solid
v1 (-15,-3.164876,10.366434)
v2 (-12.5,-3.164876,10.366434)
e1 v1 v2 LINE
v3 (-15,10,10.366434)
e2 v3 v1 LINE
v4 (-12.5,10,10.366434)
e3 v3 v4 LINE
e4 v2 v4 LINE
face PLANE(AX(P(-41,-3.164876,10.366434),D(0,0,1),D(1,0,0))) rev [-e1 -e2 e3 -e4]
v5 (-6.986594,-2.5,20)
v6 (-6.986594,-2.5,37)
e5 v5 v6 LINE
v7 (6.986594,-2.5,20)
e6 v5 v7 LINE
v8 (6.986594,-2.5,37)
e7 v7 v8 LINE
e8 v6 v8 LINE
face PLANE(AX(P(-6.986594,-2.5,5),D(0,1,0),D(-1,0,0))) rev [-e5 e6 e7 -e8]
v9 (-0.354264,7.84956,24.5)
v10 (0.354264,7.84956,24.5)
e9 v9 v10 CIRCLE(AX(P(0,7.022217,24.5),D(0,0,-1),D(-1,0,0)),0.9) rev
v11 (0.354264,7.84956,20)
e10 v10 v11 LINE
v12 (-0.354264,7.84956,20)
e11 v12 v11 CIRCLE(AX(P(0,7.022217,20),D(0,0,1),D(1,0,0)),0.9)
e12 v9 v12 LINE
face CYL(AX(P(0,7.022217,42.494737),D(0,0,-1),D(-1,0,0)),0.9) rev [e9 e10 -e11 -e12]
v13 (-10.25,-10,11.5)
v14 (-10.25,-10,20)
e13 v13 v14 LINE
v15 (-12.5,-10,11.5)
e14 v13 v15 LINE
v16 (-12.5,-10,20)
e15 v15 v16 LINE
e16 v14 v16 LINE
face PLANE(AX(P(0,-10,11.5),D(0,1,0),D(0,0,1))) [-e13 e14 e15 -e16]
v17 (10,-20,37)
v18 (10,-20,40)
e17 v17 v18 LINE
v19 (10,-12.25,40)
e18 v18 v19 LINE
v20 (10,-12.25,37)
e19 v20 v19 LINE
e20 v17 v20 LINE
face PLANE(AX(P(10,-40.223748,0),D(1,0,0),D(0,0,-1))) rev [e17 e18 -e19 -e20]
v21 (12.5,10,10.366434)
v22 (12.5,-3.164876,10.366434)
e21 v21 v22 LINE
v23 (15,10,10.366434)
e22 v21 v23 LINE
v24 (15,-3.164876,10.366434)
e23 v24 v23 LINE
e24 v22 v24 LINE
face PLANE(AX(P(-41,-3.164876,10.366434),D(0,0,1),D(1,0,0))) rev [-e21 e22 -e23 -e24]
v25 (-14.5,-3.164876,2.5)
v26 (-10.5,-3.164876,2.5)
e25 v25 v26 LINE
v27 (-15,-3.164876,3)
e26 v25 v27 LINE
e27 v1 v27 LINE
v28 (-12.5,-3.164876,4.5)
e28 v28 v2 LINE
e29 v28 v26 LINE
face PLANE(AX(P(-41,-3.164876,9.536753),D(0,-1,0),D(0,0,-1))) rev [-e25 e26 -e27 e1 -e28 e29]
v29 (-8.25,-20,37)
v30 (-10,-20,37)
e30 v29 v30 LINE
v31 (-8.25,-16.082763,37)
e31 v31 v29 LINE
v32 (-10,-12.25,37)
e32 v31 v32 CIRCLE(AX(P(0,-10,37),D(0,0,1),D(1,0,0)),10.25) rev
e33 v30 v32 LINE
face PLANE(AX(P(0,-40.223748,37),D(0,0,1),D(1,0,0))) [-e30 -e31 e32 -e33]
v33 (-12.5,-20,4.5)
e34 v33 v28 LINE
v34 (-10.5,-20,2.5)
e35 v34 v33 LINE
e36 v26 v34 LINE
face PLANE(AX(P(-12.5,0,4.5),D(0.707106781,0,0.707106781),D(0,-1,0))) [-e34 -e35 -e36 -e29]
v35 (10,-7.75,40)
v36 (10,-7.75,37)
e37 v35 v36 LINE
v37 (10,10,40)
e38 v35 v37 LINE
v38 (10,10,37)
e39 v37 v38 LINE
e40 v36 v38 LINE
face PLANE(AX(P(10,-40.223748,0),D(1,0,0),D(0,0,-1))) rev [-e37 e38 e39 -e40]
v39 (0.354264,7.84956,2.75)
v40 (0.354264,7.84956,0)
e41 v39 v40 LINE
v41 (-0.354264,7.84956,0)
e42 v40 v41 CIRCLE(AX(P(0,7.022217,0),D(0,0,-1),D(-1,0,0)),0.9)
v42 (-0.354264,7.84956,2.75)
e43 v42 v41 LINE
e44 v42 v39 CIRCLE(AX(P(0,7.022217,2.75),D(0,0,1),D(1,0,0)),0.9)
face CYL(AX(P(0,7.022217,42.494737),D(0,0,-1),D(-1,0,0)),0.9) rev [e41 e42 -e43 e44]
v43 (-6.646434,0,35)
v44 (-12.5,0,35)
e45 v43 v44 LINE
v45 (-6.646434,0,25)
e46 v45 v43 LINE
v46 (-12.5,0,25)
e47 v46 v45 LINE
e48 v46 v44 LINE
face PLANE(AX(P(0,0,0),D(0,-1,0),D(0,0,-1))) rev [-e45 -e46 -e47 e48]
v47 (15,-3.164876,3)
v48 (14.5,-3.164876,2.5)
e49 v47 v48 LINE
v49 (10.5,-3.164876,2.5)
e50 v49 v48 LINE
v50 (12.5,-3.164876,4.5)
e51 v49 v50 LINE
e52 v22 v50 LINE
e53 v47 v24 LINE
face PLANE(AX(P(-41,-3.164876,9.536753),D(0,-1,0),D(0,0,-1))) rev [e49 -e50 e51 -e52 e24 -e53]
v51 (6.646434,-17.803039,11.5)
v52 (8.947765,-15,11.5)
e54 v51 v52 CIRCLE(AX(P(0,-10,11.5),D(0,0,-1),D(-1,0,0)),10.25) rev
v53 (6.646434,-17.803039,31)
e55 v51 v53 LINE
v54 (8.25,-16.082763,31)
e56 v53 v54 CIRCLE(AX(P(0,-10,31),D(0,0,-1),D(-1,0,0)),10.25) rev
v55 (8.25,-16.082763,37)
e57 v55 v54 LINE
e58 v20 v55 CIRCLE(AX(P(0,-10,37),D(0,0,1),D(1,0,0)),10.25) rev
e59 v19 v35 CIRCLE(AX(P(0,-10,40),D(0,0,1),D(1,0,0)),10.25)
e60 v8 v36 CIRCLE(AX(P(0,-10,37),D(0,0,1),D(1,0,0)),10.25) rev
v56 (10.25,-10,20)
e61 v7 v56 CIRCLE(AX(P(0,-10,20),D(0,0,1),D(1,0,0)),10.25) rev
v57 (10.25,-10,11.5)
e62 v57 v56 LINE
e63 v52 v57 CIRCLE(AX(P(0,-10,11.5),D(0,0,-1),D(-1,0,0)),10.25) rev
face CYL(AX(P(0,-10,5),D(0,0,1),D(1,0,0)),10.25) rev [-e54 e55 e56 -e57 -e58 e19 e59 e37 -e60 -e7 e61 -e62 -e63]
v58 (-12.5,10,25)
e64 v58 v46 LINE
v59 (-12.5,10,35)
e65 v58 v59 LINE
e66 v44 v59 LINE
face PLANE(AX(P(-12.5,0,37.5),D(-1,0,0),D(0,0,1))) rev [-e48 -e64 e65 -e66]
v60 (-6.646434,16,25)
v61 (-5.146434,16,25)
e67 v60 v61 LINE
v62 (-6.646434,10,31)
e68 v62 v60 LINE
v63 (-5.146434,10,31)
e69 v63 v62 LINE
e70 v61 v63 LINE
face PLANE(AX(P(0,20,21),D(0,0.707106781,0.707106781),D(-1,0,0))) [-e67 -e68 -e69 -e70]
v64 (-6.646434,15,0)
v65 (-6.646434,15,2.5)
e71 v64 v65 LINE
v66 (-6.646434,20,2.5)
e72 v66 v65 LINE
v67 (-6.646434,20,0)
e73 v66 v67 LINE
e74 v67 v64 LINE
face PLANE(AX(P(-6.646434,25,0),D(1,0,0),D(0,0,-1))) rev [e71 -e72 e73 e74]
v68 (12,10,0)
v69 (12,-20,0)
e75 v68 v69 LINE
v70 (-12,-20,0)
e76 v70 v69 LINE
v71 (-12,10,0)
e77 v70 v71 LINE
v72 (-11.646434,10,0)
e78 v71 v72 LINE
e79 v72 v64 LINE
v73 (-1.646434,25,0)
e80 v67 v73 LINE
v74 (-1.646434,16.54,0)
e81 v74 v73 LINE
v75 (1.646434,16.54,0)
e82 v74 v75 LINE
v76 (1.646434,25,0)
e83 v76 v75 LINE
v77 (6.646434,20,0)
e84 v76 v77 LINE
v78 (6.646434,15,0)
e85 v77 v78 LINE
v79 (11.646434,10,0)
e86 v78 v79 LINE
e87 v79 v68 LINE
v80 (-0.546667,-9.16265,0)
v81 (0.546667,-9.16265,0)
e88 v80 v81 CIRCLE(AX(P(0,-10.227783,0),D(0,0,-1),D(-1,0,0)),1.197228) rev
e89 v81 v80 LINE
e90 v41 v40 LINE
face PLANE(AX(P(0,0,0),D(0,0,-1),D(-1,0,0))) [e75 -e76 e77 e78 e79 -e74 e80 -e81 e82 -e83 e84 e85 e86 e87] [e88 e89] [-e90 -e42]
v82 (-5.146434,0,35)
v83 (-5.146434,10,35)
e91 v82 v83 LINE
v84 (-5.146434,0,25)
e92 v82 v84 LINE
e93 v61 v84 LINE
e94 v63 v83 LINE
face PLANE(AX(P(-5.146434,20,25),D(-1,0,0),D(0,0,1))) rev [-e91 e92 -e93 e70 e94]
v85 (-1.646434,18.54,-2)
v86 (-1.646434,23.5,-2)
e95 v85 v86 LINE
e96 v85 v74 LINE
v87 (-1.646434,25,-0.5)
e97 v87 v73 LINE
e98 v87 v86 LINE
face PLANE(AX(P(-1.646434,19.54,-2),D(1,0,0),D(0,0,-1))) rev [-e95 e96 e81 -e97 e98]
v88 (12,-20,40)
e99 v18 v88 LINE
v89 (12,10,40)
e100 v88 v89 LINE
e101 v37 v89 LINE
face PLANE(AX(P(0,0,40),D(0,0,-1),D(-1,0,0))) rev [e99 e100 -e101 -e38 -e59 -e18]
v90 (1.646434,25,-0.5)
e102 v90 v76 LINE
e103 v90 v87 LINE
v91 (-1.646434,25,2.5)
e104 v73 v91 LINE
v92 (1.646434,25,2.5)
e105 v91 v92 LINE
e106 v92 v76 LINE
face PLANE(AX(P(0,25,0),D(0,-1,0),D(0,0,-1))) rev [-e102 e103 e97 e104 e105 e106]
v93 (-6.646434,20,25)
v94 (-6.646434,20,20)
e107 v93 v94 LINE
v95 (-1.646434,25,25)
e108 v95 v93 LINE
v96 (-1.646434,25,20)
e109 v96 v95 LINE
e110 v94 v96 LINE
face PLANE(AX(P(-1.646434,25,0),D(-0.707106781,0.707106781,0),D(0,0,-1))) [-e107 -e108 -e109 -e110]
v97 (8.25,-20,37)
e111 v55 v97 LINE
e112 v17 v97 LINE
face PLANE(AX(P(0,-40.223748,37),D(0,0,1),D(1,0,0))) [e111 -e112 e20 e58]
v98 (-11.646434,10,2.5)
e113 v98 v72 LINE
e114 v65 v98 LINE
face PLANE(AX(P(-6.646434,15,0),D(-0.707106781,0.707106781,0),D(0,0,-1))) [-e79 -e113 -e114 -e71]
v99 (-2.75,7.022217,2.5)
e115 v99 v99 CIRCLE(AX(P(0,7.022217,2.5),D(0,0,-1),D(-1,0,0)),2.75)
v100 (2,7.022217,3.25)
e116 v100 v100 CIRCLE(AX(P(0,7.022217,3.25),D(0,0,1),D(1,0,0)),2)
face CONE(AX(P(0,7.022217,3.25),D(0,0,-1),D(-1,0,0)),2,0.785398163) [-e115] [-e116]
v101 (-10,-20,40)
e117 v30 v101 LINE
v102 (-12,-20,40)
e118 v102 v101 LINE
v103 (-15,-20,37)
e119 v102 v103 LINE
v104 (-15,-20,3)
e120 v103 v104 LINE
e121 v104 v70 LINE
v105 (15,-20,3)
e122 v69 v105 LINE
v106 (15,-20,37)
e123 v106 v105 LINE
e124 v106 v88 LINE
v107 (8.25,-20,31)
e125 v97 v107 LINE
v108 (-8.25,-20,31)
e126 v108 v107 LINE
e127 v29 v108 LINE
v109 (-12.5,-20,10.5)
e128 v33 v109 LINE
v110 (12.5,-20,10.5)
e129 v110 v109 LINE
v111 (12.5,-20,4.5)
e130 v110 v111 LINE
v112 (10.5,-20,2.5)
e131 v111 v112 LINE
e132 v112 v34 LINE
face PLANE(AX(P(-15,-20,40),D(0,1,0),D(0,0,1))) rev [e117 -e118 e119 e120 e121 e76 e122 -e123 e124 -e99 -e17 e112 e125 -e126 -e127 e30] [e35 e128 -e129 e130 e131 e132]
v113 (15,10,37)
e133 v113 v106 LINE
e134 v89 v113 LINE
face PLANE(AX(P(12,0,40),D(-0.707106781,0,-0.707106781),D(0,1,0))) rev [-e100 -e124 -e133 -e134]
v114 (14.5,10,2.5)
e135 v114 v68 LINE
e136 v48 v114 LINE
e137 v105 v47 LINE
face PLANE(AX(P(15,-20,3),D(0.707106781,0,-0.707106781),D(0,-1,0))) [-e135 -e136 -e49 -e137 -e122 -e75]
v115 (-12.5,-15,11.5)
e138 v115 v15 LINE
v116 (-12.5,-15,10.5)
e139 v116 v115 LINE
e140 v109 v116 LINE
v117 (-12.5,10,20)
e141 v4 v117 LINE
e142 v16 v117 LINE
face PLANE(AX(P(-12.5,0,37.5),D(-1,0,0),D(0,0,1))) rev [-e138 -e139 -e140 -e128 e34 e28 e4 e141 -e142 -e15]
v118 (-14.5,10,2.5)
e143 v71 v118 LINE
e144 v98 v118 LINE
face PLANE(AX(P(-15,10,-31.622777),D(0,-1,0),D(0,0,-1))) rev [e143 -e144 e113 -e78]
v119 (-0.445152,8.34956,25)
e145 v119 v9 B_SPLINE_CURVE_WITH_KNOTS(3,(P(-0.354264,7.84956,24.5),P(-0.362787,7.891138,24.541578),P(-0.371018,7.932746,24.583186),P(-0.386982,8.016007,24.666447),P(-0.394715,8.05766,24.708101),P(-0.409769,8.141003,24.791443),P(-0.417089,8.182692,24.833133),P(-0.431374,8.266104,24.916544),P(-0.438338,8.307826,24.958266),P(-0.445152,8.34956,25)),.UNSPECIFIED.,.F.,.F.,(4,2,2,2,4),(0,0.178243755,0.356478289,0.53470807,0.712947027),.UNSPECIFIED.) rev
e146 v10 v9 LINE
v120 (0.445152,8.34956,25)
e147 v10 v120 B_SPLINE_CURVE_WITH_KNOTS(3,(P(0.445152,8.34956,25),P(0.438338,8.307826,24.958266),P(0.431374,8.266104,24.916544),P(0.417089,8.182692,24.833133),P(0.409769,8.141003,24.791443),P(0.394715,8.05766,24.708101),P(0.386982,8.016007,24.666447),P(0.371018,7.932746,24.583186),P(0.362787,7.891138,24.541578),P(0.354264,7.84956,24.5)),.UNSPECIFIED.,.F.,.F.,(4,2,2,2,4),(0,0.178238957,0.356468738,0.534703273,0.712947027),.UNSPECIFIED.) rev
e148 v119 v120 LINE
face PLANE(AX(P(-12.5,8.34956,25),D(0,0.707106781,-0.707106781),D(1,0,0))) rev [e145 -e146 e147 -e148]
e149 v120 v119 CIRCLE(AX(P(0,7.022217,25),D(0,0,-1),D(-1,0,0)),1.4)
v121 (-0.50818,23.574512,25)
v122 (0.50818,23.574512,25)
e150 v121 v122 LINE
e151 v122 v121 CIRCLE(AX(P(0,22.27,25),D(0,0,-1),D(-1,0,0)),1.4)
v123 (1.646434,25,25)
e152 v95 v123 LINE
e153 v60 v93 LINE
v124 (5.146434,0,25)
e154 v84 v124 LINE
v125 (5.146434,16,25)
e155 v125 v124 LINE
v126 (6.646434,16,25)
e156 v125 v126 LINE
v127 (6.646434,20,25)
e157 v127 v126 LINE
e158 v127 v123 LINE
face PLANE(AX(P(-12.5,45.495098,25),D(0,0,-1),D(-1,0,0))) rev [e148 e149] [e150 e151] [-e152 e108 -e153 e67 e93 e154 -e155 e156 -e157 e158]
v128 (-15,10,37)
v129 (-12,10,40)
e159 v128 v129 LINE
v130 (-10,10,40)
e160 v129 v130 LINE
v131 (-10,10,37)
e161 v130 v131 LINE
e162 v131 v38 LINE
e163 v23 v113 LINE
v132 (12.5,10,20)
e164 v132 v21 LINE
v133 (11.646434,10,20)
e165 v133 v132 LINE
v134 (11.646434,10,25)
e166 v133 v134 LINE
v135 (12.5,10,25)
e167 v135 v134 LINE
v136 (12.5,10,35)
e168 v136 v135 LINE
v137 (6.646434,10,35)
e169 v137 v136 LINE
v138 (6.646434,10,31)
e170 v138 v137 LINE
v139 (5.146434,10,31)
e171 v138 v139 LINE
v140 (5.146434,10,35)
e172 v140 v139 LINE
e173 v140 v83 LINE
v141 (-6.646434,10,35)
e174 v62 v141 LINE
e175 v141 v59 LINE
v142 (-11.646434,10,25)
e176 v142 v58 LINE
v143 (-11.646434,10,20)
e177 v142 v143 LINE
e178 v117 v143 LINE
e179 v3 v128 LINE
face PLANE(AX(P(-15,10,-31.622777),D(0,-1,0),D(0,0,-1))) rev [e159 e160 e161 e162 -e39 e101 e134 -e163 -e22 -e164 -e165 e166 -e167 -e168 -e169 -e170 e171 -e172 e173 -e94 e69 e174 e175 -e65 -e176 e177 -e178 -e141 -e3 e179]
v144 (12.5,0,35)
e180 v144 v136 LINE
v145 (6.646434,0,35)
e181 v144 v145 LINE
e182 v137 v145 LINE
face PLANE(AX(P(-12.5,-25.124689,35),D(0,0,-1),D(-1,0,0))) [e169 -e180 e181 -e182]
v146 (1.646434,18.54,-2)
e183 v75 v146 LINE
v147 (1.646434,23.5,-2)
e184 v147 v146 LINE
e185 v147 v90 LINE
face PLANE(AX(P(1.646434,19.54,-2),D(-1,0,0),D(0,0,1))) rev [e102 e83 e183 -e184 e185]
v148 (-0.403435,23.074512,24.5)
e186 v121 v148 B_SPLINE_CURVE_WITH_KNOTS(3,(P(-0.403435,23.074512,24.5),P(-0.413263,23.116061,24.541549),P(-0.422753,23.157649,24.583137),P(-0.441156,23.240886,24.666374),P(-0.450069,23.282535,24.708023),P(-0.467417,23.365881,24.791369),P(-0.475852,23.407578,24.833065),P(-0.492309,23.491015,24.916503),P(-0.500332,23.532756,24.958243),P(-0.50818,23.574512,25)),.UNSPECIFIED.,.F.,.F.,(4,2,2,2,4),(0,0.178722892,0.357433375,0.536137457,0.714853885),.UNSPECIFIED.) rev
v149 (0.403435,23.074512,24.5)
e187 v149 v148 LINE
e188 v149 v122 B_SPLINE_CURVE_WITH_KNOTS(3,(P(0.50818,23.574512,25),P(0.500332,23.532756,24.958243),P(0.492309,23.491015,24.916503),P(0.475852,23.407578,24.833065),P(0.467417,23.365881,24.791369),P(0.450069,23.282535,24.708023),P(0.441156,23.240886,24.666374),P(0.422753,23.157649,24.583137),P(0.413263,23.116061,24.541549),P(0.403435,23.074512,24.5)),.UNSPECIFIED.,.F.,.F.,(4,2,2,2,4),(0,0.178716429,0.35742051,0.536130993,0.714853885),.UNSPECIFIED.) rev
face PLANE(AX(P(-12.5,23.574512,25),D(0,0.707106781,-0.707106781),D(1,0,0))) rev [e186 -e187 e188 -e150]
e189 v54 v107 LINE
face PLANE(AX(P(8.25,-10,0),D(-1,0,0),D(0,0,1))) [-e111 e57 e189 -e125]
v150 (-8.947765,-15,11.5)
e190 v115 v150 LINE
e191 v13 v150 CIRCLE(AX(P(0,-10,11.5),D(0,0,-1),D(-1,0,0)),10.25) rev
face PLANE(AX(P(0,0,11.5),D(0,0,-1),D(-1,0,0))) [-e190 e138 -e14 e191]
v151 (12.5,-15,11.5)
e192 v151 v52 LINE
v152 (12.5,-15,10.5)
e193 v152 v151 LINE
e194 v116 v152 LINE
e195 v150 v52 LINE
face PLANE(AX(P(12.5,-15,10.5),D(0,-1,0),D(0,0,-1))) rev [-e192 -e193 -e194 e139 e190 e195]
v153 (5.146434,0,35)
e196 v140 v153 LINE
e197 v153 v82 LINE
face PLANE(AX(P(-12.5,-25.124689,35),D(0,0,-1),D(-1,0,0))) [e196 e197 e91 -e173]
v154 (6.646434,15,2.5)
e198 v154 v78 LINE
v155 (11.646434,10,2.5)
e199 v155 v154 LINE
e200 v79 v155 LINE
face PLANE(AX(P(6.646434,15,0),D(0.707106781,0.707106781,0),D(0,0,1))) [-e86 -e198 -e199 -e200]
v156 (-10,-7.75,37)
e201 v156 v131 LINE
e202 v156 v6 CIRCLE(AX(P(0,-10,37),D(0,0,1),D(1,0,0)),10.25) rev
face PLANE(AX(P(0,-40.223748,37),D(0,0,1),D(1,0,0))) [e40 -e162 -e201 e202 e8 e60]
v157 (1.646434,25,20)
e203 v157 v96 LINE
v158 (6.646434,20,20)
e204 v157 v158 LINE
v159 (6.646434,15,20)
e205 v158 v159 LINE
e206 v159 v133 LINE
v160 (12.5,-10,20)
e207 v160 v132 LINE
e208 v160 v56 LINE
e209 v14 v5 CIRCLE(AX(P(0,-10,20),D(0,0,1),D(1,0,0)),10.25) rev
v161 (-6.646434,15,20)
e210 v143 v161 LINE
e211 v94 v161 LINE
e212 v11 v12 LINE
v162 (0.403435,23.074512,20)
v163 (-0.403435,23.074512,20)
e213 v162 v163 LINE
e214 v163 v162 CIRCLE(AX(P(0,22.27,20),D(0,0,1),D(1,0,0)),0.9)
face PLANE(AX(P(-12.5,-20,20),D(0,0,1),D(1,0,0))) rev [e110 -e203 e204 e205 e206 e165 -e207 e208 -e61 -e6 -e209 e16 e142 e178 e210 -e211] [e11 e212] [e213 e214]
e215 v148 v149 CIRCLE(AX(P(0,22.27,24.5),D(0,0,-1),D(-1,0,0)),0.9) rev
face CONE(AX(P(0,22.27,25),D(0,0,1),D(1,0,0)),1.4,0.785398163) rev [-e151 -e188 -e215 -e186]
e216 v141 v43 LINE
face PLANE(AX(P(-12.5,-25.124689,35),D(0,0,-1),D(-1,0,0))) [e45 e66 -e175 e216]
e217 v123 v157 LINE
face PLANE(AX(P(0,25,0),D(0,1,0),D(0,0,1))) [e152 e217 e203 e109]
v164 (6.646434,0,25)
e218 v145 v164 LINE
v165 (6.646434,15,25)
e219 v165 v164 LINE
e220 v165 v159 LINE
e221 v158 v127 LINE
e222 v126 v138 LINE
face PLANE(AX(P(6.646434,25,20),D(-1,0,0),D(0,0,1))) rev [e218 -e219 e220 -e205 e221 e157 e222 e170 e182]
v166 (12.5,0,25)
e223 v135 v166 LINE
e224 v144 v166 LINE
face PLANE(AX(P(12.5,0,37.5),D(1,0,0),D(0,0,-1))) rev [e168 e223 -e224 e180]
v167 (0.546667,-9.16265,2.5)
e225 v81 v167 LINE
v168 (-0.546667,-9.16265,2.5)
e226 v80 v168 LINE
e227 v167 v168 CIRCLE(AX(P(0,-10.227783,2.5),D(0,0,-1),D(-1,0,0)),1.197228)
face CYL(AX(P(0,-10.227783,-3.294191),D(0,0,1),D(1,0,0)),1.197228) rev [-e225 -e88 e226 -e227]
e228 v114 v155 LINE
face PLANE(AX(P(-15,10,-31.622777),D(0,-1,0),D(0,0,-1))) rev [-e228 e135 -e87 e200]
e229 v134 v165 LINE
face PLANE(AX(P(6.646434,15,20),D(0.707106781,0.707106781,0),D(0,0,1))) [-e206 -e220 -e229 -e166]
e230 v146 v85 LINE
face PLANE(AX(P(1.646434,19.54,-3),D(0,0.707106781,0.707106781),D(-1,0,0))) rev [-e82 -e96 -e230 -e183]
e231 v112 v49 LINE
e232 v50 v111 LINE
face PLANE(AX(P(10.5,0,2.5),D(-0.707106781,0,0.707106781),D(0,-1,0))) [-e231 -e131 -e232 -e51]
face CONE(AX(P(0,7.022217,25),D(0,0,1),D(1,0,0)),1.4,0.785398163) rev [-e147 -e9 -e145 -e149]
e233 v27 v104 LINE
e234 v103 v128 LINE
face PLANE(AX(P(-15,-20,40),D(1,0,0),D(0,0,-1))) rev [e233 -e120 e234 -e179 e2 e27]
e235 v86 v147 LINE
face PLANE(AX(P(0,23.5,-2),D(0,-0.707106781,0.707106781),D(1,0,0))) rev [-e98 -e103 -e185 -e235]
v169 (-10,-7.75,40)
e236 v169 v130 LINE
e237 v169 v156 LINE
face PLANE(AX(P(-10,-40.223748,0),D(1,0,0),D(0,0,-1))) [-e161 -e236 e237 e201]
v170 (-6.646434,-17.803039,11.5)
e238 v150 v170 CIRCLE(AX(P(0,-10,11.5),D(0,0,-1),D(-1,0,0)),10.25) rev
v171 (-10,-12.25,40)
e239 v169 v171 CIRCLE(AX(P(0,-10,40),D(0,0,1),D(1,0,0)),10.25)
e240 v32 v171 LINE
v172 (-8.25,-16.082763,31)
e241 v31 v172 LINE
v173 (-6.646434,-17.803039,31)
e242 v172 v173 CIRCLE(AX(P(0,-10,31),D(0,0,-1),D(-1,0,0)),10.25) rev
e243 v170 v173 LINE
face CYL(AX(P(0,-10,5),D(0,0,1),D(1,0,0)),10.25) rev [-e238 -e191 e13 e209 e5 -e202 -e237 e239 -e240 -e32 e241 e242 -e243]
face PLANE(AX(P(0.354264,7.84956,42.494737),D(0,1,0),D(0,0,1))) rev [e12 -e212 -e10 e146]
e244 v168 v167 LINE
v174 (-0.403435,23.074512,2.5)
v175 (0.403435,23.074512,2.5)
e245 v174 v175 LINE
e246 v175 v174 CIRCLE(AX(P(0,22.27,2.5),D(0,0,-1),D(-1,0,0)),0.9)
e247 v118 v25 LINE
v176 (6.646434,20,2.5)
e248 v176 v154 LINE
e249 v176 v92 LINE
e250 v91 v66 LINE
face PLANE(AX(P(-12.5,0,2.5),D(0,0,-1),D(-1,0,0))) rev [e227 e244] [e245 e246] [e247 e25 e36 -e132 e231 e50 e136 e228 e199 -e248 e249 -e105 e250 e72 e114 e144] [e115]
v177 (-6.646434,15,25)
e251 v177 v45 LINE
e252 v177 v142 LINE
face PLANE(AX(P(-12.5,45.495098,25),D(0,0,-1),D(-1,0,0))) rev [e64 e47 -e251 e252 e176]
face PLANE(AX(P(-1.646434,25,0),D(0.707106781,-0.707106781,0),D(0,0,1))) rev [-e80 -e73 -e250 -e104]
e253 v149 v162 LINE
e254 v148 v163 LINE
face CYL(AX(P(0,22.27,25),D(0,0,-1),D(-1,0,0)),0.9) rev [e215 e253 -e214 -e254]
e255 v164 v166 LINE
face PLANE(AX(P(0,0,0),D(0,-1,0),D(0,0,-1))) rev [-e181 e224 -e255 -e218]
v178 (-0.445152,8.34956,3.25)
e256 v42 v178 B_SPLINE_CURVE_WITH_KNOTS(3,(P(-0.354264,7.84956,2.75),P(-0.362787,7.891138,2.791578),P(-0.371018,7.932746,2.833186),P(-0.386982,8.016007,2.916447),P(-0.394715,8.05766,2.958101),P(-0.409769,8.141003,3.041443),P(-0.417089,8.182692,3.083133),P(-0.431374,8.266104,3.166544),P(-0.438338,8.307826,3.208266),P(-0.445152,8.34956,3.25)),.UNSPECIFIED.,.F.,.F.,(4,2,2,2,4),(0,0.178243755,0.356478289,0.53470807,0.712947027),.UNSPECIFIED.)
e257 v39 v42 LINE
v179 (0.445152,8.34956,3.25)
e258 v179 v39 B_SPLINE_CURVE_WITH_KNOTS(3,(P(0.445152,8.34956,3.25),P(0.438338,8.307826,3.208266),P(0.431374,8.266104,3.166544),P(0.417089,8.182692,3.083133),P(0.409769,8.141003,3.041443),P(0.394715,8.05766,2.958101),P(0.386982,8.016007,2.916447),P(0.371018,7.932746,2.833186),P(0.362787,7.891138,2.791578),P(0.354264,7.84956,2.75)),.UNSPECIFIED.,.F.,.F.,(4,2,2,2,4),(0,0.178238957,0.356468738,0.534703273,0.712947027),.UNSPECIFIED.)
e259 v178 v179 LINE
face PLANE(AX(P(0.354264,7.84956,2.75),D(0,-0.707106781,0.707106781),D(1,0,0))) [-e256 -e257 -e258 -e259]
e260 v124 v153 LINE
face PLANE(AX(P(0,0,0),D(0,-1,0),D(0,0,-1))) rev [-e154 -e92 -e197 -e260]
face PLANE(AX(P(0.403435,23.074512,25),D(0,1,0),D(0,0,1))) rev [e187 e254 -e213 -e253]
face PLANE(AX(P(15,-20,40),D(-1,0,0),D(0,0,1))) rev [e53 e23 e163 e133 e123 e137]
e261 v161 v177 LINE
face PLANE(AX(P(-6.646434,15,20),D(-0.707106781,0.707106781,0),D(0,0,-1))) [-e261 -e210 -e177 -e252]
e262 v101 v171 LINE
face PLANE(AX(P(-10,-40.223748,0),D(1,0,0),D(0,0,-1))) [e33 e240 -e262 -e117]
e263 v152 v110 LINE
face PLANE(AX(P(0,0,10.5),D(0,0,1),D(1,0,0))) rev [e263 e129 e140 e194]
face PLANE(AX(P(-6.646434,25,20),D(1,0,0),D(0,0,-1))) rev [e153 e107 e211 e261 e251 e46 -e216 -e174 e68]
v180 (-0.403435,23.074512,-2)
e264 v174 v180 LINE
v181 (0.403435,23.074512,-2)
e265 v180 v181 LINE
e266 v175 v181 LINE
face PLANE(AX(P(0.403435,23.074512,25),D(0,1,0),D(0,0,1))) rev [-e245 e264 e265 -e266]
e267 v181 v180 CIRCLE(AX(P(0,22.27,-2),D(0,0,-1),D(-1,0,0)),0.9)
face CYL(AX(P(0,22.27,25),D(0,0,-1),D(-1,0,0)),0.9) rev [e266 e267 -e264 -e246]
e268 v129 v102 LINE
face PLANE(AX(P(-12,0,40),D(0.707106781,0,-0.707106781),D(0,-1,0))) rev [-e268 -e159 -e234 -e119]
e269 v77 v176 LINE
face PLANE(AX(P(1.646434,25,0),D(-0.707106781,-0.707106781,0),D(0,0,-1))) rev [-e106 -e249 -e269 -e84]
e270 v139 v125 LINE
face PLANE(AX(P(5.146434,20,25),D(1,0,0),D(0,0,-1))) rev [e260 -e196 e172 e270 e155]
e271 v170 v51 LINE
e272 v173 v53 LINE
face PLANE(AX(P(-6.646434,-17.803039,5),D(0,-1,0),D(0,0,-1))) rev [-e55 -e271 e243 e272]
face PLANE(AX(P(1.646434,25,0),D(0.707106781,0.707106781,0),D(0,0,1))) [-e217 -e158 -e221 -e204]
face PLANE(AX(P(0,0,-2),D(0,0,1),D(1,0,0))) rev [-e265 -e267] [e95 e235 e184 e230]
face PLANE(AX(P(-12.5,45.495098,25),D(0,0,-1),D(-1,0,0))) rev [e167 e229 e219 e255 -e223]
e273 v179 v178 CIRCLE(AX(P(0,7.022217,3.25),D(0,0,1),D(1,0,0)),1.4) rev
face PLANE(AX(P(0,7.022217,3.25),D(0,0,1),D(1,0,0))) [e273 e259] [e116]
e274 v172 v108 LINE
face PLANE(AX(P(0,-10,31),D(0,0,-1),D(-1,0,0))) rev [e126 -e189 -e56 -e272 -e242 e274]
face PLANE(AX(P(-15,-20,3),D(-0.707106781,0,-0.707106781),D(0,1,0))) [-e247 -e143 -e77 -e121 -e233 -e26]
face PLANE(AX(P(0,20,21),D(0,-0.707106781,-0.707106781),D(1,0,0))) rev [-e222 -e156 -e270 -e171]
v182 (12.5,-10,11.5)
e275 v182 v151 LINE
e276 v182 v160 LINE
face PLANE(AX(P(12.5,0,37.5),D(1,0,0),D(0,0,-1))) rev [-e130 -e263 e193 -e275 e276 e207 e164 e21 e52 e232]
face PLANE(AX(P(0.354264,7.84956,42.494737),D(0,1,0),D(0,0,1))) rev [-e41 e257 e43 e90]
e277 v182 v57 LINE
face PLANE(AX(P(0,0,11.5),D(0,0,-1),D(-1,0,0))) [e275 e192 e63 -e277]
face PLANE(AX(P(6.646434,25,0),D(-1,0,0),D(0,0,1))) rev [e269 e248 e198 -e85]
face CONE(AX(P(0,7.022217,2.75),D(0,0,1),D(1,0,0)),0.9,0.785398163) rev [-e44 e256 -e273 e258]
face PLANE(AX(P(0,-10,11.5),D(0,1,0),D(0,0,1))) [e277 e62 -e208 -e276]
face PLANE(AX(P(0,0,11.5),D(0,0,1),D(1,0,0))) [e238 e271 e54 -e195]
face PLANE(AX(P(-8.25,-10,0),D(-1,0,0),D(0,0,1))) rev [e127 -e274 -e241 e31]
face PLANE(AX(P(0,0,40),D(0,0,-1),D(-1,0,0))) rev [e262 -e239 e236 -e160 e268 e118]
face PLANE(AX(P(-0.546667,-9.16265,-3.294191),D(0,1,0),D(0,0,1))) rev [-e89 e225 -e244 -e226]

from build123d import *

# Parameters (mm, degrees)
SKETCH1_W            = 30
SKETCH1_H            = 40
BOSS_EXTRUDE1_DEPTH  = 40
CUT_EXTRUDE1_DEPTH   = 35
SKETCH4_W            = 25
SKETCH4_H            = 35
CUT_EXTRUDE3_DEPTH   = 20
SKETCH5_W            = 25
SKETCH5_H            = 17.5
CUT_EXTRUDE4_DEPTH   = 20
SKETCH13_W           = 25
SKETCH13_H           = 5
BOSS_EXTRUDE3_DEPTH  = 20
CUT_EXTRUDE5_DEPTH   = 40
CUT_EXTRUDE6_START   = -40
CUT_EXTRUDE6_DEPTH   = 40
CUT_EXTRUDE9_START   = -40
SKETCH10_W           = 30
SKETCH10_H           = 10
CUT_EXTRUDE9_DEPTH   = 40
CHAMFER2_SIZE        = 3
CUT_EXTRUDE10_DEPTH  = 28.5
SKETCH17_W           = 25
SKETCH17_H           = 2.5
BOSS_EXTRUDE4_DEPTH  = 10
CUT_EXTRUDE13_START  = -30
SKETCH18_W           = 20
SKETCH18_H           = 3
CUT_EXTRUDE13_DEPTH  = 30
SKETCH19_W           = 16.5
SKETCH19_H           = 6
CUT_EXTRUDE14_DEPTH  = 10
BOSS_EXTRUDE5_DEPTH  = 8.5
SKETCH22_W           = 25
SKETCH22_H           = 5
BOSS_EXTRUDE6_DEPTH  = 1
SKETCH23_W           = 13.292868742
SKETCH23_H           = 5
BOSS_EXTRUDE7_DEPTH  = 15
CHAMFER4_SIZE        = 5
CHAMFER6_SIZE        = 5
SKETCH30_W           = 1.5
SKETCH30_H           = 10
BOSS_EXTRUDE8_DEPTH  = 20
CHAMFER10_SIZE       = 14
CUT_EXTRUDE15_DEPTH  = 25
CHAMFER11_SIZE       = 2
BOSS_EXTRUDE9_START  = 0.75
SKETCH31_R           = 2
BOSS_EXTRUDE9_DEPTH  = 0.75
CHAMFER12_SIZE       = 0.5
CHAMFER13_SIZE       = 0.5
CHAMFER14_SIZE       = 0.75
CHAMFER15_SIZE       = 0.5
BOSS_EXTRUDE10_START = 2
SKETCH32_W           = 3.292868742
SKETCH32_H           = 5.46
BOSS_EXTRUDE10_DEPTH = 2
CHAMFER16_SIZE       = 3
CHAMFER17_SIZE       = 1.5


# Some blends are built 0.0001 mm under size
with BuildPart() as part:
    # Sketch1 → Boss-Extrude1 (new body)
    with BuildSketch(Plane.XY):
        Rectangle(SKETCH1_W, SKETCH1_H)
    extrude(amount=BOSS_EXTRUDE1_DEPTH)

    # Sketch2 → Cut-Extrude1 (cut)
    with BuildSketch(Plane.XY.offset(40)):
        with BuildLine():
            Line((-6.986594306, -2.5), (6.986594306, -2.5))
            ThreePointArc((6.986594306, -2.5), (10.247468698, -10.227783409), (6.646434371, -17.80303852))
            Line((6.646434371, -17.80303852), (-6.646434371, -17.80303852))
            ThreePointArc((-6.646434371, -17.80303852), (-10.247468698, -10.227783409), (-6.986594306, -2.5))
        make_face()
    extrude(amount=-CUT_EXTRUDE1_DEPTH, mode=Mode.SUBTRACT)

    # Sketch4 → Cut-Extrude3 (cut)
    with BuildSketch(Plane(origin=(0, 20, 0), x_dir=(1, 0, 0), z_dir=(0, 1, 0))):
        with Locations((0, -20)):
            Rectangle(SKETCH4_W, SKETCH4_H)
    extrude(amount=-CUT_EXTRUDE3_DEPTH, mode=Mode.SUBTRACT)

    # Sketch5 → Cut-Extrude4 (cut)
    with BuildSketch(Plane(origin=(0, 0, 0), x_dir=(1, 0, 0), z_dir=(0, 1, 0))):
        with Locations((0, -11.25)):
            Rectangle(SKETCH5_W, SKETCH5_H)
    extrude(amount=-CUT_EXTRUDE4_DEPTH, mode=Mode.SUBTRACT)

    # Sketch13 → Boss-Extrude3 (add)
    with BuildSketch(Plane(origin=(0, 0, 0), x_dir=(1, 0, 0), z_dir=(0, 1, 0))):
        with Locations((0, -22.5)):
            Rectangle(SKETCH13_W, SKETCH13_H)
    extrude(amount=BOSS_EXTRUDE3_DEPTH)

    # Sketch8 → Cut-Extrude5 (cut)
    with BuildSketch(Plane.XY.offset(40)):
        with BuildLine():
            Line((-0.546667462, -9.162650201), (0.546667462, -9.162650201))
            ThreePointArc((0.546667462, -9.162650201), (0, -11.425011068), (-0.546667462, -9.162650201))
        make_face()
    extrude(amount=-CUT_EXTRUDE5_DEPTH, mode=Mode.SUBTRACT)

    # Sketch9 → Cut-Extrude6 (cut)
    with BuildSketch(Plane(origin=(0, 0, 0), x_dir=(-1, 0, 0), z_dir=(0, 0, -1)).offset(CUT_EXTRUDE6_START)):
        with BuildLine():
            Line((-0.354264308, 7.849559809), (0.354264308, 7.849559809))
            ThreePointArc((0.354264308, 7.849559809), (0, 6.122216591), (-0.354264308, 7.849559809))
        make_face()
    extrude(amount=CUT_EXTRUDE6_DEPTH, mode=Mode.SUBTRACT)

    # Sketch10 → Cut-Extrude9 (cut)
    with BuildSketch(Plane.XY.offset(40).offset(CUT_EXTRUDE9_START)):
        with Locations((0, 15)):
            Rectangle(SKETCH10_W, SKETCH10_H)
    extrude(amount=CUT_EXTRUDE9_DEPTH, mode=Mode.SUBTRACT)

    # Chamfer2
    chamfer2_edges = [part.edges().sort_by_distance(p)[0] for p in [
        (-15, -5, 0),
        (-15, -5, 40),
        (15, -5, 40),
        (15, -5, 0),
    ]]
    chamfer(chamfer2_edges, length=CHAMFER2_SIZE)

    # Sketch16 → Cut-Extrude10 (cut, symmetric)
    with BuildSketch(Plane(origin=(-12.5, 0, 0), x_dir=(0, 0, -1), z_dir=(1, 0, 0))):
        Polygon((-2.5, 10), (-9.536752506, 10), (-10.366434052, 10), (-10.366434052, -3.164876481), (-9.536752506, -3.164876481), (-2.5, -3.164876481), align=None)
    extrude(amount=CUT_EXTRUDE10_DEPTH, both=True, mode=Mode.SUBTRACT)

    # Sketch17 → Boss-Extrude4 (add)
    with BuildSketch(Plane(origin=(0, 10, 0), x_dir=(1, 0, 0), z_dir=(0, 1, 0))):
        with Locations((0, -36.25)):
            Rectangle(SKETCH17_W, SKETCH17_H)
    extrude(amount=-BOSS_EXTRUDE4_DEPTH)

    # Sketch18 → Cut-Extrude13 (cut)
    with BuildSketch(Plane(origin=(0, 10, 0), x_dir=(1, 0, 0), z_dir=(0, 1, 0)).offset(CUT_EXTRUDE13_START)):
        with Locations((0, -38.5)):
            Rectangle(SKETCH18_W, SKETCH18_H)
    extrude(amount=CUT_EXTRUDE13_DEPTH, mode=Mode.SUBTRACT)

    # Sketch19 → Cut-Extrude14 (cut)
    with BuildSketch(Plane.XZ.offset(20)):
        with Locations((0, 34)):
            Rectangle(SKETCH19_W, SKETCH19_H)
    extrude(amount=-CUT_EXTRUDE14_DEPTH, mode=Mode.SUBTRACT)

    # Sketch20 → Boss-Extrude5 (add)
    with BuildSketch(Plane(origin=(0, 0, 20), x_dir=(-1, 0, 0), z_dir=(0, 0, -1))):
        with BuildLine():
            Line((12.5, -10), (10.25, -10))
            ThreePointArc((10.25, -10), (9.305601869, -14.297472961), (6.646434371, -17.80303852))
            Line((6.646434371, -17.80303852), (-6.646434371, -17.80303852))
            ThreePointArc((-6.646434371, -17.80303852), (-9.305601869, -14.297472961), (-10.25, -10))
            Line((-10.25, -10), (-12.5, -10))
            Line((-12.5, -10), (-12.5, -20))
            Line((-12.5, -20), (12.5, -20))
            Line((12.5, -20), (12.5, -10))
        make_face()
    extrude(amount=BOSS_EXTRUDE5_DEPTH)

    # Sketch22 → Boss-Extrude6 (add)
    with BuildSketch(Plane(origin=(0, 0, 11.5), x_dir=(-1, 0, 0), z_dir=(0, 0, -1))):
        with Locations((0, -17.5)):
            Rectangle(SKETCH22_W, SKETCH22_H)
    extrude(amount=BOSS_EXTRUDE6_DEPTH)

    # Sketch23 → Boss-Extrude7 (add)
    with BuildSketch(Plane(origin=(0, 10, 0), x_dir=(1, 0, 0), z_dir=(0, 1, 0))):
        with Locations((0, -22.5)):
            Rectangle(SKETCH23_W, SKETCH23_H)
        Polygon((6.646434371, 0), (6.646434371, -2.5), (0, -2.5), (-6.646434371, -2.5), (-6.646434371, 0), align=None)
    extrude(amount=BOSS_EXTRUDE7_DEPTH)

    # Chamfer4
    chamfer4_edges = [part.edges().sort_by_distance(p)[0] for p in [
        (6.646434371, 10, 22.5),
        (-6.646434371, 10, 22.5),
        (6.646434371, 10, 1.25),
        (-6.646434371, 10, 1.25),
    ]]
    chamfer(chamfer4_edges, length=CHAMFER4_SIZE)

    # Chamfer6
    chamfer6_edges = [part.edges().sort_by_distance(p)[0] for p in [
        (6.646434371, 25, 22.5),
        (-6.646434371, 25, 22.5),
        (6.646434371, 25, 1.25),
        (-6.646434371, 25, 1.25),
    ]]
    chamfer(chamfer6_edges, length=CHAMFER6_SIZE)

    # Sketch30 → Boss-Extrude8 (add)
    with BuildSketch(Plane(origin=(0, 0, 0), x_dir=(1, 0, 0), z_dir=(0, 1, 0))):
        with Locations((-5.896434371, -30)):
            Rectangle(SKETCH30_W, SKETCH30_H)
        with Locations((5.896434371, -30)):
            Rectangle(SKETCH30_W, SKETCH30_H)
    extrude(amount=BOSS_EXTRUDE8_DEPTH)

    # Chamfer10
    # the kernel refuses this chamfer: 14 mm, written as the material it takes off along each edge
    with BuildSketch(Plane(origin=(-30.85712746, 20, 35), x_dir=(0, -0.9996219169112968, 0.02749587661058661), z_dir=(1, 0, 0))) as chamfer10_piece_1_section:
        Polygon((CHAMFER10_SIZE * 0.999621916911, CHAMFER10_SIZE * 0.0274958766106), (-CHAMFER10_SIZE * 0.0274958766106, CHAMFER10_SIZE * 0.999621916911), (0, 0), align=None)
    chamfer10_piece_1 = extrude(amount=73.507123663, mode=Mode.PRIVATE)
    chamfer10_piece_1 = split(chamfer10_piece_1, bisect_by=Plane(origin=(5.896434371, 10, 30.768271906), z_dir=(0, 1, 0)), keep=Keep.TOP, mode=Mode.PRIVATE)
    chamfer10_piece_1 = split(chamfer10_piece_1, bisect_by=Plane(origin=(5.896434371, 15.768271906, 25), z_dir=(0, 0, 1)), keep=Keep.TOP, mode=Mode.PRIVATE)
    add(chamfer10_piece_1, mode=Mode.SUBTRACT)
    with BuildSketch(Plane(origin=(30.85712746, 20, 35), x_dir=(0, -0.9996219169112968, 0.02749587661058661), z_dir=(-1, 0, 0))) as chamfer10_piece_2_section:
        Polygon((CHAMFER10_SIZE * 0.999621916911, -CHAMFER10_SIZE * 0.0274958766106), (-CHAMFER10_SIZE * 0.0274958766106, -CHAMFER10_SIZE * 0.999621916911), (0, 0), align=None)
    chamfer10_piece_2 = extrude(amount=73.507123663, mode=Mode.PRIVATE)
    chamfer10_piece_2 = split(chamfer10_piece_2, bisect_by=Plane(origin=(-5.896434371, 10, 30.768271906), z_dir=(0, 1, 0)), keep=Keep.TOP, mode=Mode.PRIVATE)
    chamfer10_piece_2 = split(chamfer10_piece_2, bisect_by=Plane(origin=(-5.896434371, 15.768271906, 25), z_dir=(0, 0, 1)), keep=Keep.TOP, mode=Mode.PRIVATE)
    add(chamfer10_piece_2, mode=Mode.SUBTRACT)

    # Sketch29 → Cut-Extrude15 (cut)
    with BuildSketch(Plane(origin=(0, 0, 0), x_dir=(-1, 0, 0), z_dir=(0, 0, -1))):
        with BuildLine():
            Line((-0.403434811, 23.074512494), (0.403434811, 23.074512494))
            ThreePointArc((0.403434811, 23.074512494), (0, 21.37), (-0.403434811, 23.074512494))
        make_face()
    extrude(amount=-CUT_EXTRUDE15_DEPTH, mode=Mode.SUBTRACT)

    # Chamfer11
    chamfer11_edges = [part.edges().sort_by_distance(p)[0] for p in [
        (12.5, -11.58243824, 2.5),
        (-12.5, -11.58243824, 2.5),
    ]]
    chamfer(chamfer11_edges, length=CHAMFER11_SIZE)

    # Sketch31 → Boss-Extrude9 (add)
    with BuildSketch(Plane.XY.offset(2.5).offset(BOSS_EXTRUDE9_START)):
        with Locations(Location((0, 7.022216591, 0), (0, 0, 180))):
            Circle(SKETCH31_R)
        with BuildLine():
            Line((-0.354264308, 7.849559809), (0.354264308, 7.849559809))
            ThreePointArc((0.354264308, 7.849559809), (0, 6.122216591), (-0.354264308, 7.849559809))
        make_face(mode=Mode.SUBTRACT)
    extrude(amount=-BOSS_EXTRUDE9_DEPTH)

    # Chamfer12
    chamfer12_edges = [part.edges().sort_by_distance(p)[0] for p in [
        (0, 6.122216591, 3.25),
    ]]
    chamfer(chamfer12_edges, length=CHAMFER12_SIZE)

    # Chamfer13
    chamfer13_edges = [part.edges().sort_by_distance(p)[0] for p in [
        (0, 7.849559809, 3.25),
    ]]
    chamfer(chamfer13_edges, length=CHAMFER13_SIZE)

    # Chamfer14
    chamfer14_edges = [part.edges().sort_by_distance(p)[0] for p in [
        (2, 7.022216591, 2.5),
    ]]
    chamfer(chamfer14_edges, length=CHAMFER14_SIZE - 0.0001)  # a hair under: the kernel refuses the full size

    # Chamfer15
    chamfer15_edges = [part.edges().sort_by_distance(p)[0] for p in [
        (0, 21.37, 25),
        (0, 23.074512494, 25),
        (0, 7.849559809, 25),
        (0, 6.122216591, 25),
    ]]
    chamfer(chamfer15_edges, length=CHAMFER15_SIZE)

    # Sketch32 → Boss-Extrude10 (add)
    with BuildSketch(Plane(origin=(0, 0, 0), x_dir=(-1, 0, 0), z_dir=(0, 0, -1)).offset(BOSS_EXTRUDE10_START)):
        with Locations((0, 22.27)):
            Rectangle(SKETCH32_W, SKETCH32_H)
        with BuildLine():
            Line((0.403434811, 23.074512494), (-0.403434811, 23.074512494))
            ThreePointArc((-0.403434811, 23.074512494), (0, 21.37), (0.403434811, 23.074512494))
        make_face(mode=Mode.SUBTRACT)
    extrude(amount=-BOSS_EXTRUDE10_DEPTH)

    # Chamfer16
    # the kernel refuses this chamfer: 3 mm, written as the material it adds along each edge
    with BuildSketch(Plane(origin=(1.646434371, 19.54, 0), x_dir=(0, -0.9996219169112968, 0.02749587661058636), z_dir=(-1, 0, 0))) as chamfer16_piece_1_section:
        Polygon((CHAMFER16_SIZE * 0.999621916911, -CHAMFER16_SIZE * 0.0274958766106), (-CHAMFER16_SIZE * 0.0274958766106, -CHAMFER16_SIZE * 0.999621916911), (0, 0), align=None)
    chamfer16_piece_1 = extrude(amount=3.292868742, mode=Mode.PRIVATE)
    chamfer16_piece_1 = split(chamfer16_piece_1, bisect_by=Plane(origin=(0, 18.447908995, -2), z_dir=(0, 0, 1)), keep=Keep.TOP, mode=Mode.PRIVATE)
    add(chamfer16_piece_1)

    # Chamfer17
    chamfer17_edges = [part.edges().sort_by_distance(p)[0] for p in [
        (0, 25, -2),
    ]]
    chamfer(chamfer17_edges, length=CHAMFER17_SIZE)


solid = part.part
